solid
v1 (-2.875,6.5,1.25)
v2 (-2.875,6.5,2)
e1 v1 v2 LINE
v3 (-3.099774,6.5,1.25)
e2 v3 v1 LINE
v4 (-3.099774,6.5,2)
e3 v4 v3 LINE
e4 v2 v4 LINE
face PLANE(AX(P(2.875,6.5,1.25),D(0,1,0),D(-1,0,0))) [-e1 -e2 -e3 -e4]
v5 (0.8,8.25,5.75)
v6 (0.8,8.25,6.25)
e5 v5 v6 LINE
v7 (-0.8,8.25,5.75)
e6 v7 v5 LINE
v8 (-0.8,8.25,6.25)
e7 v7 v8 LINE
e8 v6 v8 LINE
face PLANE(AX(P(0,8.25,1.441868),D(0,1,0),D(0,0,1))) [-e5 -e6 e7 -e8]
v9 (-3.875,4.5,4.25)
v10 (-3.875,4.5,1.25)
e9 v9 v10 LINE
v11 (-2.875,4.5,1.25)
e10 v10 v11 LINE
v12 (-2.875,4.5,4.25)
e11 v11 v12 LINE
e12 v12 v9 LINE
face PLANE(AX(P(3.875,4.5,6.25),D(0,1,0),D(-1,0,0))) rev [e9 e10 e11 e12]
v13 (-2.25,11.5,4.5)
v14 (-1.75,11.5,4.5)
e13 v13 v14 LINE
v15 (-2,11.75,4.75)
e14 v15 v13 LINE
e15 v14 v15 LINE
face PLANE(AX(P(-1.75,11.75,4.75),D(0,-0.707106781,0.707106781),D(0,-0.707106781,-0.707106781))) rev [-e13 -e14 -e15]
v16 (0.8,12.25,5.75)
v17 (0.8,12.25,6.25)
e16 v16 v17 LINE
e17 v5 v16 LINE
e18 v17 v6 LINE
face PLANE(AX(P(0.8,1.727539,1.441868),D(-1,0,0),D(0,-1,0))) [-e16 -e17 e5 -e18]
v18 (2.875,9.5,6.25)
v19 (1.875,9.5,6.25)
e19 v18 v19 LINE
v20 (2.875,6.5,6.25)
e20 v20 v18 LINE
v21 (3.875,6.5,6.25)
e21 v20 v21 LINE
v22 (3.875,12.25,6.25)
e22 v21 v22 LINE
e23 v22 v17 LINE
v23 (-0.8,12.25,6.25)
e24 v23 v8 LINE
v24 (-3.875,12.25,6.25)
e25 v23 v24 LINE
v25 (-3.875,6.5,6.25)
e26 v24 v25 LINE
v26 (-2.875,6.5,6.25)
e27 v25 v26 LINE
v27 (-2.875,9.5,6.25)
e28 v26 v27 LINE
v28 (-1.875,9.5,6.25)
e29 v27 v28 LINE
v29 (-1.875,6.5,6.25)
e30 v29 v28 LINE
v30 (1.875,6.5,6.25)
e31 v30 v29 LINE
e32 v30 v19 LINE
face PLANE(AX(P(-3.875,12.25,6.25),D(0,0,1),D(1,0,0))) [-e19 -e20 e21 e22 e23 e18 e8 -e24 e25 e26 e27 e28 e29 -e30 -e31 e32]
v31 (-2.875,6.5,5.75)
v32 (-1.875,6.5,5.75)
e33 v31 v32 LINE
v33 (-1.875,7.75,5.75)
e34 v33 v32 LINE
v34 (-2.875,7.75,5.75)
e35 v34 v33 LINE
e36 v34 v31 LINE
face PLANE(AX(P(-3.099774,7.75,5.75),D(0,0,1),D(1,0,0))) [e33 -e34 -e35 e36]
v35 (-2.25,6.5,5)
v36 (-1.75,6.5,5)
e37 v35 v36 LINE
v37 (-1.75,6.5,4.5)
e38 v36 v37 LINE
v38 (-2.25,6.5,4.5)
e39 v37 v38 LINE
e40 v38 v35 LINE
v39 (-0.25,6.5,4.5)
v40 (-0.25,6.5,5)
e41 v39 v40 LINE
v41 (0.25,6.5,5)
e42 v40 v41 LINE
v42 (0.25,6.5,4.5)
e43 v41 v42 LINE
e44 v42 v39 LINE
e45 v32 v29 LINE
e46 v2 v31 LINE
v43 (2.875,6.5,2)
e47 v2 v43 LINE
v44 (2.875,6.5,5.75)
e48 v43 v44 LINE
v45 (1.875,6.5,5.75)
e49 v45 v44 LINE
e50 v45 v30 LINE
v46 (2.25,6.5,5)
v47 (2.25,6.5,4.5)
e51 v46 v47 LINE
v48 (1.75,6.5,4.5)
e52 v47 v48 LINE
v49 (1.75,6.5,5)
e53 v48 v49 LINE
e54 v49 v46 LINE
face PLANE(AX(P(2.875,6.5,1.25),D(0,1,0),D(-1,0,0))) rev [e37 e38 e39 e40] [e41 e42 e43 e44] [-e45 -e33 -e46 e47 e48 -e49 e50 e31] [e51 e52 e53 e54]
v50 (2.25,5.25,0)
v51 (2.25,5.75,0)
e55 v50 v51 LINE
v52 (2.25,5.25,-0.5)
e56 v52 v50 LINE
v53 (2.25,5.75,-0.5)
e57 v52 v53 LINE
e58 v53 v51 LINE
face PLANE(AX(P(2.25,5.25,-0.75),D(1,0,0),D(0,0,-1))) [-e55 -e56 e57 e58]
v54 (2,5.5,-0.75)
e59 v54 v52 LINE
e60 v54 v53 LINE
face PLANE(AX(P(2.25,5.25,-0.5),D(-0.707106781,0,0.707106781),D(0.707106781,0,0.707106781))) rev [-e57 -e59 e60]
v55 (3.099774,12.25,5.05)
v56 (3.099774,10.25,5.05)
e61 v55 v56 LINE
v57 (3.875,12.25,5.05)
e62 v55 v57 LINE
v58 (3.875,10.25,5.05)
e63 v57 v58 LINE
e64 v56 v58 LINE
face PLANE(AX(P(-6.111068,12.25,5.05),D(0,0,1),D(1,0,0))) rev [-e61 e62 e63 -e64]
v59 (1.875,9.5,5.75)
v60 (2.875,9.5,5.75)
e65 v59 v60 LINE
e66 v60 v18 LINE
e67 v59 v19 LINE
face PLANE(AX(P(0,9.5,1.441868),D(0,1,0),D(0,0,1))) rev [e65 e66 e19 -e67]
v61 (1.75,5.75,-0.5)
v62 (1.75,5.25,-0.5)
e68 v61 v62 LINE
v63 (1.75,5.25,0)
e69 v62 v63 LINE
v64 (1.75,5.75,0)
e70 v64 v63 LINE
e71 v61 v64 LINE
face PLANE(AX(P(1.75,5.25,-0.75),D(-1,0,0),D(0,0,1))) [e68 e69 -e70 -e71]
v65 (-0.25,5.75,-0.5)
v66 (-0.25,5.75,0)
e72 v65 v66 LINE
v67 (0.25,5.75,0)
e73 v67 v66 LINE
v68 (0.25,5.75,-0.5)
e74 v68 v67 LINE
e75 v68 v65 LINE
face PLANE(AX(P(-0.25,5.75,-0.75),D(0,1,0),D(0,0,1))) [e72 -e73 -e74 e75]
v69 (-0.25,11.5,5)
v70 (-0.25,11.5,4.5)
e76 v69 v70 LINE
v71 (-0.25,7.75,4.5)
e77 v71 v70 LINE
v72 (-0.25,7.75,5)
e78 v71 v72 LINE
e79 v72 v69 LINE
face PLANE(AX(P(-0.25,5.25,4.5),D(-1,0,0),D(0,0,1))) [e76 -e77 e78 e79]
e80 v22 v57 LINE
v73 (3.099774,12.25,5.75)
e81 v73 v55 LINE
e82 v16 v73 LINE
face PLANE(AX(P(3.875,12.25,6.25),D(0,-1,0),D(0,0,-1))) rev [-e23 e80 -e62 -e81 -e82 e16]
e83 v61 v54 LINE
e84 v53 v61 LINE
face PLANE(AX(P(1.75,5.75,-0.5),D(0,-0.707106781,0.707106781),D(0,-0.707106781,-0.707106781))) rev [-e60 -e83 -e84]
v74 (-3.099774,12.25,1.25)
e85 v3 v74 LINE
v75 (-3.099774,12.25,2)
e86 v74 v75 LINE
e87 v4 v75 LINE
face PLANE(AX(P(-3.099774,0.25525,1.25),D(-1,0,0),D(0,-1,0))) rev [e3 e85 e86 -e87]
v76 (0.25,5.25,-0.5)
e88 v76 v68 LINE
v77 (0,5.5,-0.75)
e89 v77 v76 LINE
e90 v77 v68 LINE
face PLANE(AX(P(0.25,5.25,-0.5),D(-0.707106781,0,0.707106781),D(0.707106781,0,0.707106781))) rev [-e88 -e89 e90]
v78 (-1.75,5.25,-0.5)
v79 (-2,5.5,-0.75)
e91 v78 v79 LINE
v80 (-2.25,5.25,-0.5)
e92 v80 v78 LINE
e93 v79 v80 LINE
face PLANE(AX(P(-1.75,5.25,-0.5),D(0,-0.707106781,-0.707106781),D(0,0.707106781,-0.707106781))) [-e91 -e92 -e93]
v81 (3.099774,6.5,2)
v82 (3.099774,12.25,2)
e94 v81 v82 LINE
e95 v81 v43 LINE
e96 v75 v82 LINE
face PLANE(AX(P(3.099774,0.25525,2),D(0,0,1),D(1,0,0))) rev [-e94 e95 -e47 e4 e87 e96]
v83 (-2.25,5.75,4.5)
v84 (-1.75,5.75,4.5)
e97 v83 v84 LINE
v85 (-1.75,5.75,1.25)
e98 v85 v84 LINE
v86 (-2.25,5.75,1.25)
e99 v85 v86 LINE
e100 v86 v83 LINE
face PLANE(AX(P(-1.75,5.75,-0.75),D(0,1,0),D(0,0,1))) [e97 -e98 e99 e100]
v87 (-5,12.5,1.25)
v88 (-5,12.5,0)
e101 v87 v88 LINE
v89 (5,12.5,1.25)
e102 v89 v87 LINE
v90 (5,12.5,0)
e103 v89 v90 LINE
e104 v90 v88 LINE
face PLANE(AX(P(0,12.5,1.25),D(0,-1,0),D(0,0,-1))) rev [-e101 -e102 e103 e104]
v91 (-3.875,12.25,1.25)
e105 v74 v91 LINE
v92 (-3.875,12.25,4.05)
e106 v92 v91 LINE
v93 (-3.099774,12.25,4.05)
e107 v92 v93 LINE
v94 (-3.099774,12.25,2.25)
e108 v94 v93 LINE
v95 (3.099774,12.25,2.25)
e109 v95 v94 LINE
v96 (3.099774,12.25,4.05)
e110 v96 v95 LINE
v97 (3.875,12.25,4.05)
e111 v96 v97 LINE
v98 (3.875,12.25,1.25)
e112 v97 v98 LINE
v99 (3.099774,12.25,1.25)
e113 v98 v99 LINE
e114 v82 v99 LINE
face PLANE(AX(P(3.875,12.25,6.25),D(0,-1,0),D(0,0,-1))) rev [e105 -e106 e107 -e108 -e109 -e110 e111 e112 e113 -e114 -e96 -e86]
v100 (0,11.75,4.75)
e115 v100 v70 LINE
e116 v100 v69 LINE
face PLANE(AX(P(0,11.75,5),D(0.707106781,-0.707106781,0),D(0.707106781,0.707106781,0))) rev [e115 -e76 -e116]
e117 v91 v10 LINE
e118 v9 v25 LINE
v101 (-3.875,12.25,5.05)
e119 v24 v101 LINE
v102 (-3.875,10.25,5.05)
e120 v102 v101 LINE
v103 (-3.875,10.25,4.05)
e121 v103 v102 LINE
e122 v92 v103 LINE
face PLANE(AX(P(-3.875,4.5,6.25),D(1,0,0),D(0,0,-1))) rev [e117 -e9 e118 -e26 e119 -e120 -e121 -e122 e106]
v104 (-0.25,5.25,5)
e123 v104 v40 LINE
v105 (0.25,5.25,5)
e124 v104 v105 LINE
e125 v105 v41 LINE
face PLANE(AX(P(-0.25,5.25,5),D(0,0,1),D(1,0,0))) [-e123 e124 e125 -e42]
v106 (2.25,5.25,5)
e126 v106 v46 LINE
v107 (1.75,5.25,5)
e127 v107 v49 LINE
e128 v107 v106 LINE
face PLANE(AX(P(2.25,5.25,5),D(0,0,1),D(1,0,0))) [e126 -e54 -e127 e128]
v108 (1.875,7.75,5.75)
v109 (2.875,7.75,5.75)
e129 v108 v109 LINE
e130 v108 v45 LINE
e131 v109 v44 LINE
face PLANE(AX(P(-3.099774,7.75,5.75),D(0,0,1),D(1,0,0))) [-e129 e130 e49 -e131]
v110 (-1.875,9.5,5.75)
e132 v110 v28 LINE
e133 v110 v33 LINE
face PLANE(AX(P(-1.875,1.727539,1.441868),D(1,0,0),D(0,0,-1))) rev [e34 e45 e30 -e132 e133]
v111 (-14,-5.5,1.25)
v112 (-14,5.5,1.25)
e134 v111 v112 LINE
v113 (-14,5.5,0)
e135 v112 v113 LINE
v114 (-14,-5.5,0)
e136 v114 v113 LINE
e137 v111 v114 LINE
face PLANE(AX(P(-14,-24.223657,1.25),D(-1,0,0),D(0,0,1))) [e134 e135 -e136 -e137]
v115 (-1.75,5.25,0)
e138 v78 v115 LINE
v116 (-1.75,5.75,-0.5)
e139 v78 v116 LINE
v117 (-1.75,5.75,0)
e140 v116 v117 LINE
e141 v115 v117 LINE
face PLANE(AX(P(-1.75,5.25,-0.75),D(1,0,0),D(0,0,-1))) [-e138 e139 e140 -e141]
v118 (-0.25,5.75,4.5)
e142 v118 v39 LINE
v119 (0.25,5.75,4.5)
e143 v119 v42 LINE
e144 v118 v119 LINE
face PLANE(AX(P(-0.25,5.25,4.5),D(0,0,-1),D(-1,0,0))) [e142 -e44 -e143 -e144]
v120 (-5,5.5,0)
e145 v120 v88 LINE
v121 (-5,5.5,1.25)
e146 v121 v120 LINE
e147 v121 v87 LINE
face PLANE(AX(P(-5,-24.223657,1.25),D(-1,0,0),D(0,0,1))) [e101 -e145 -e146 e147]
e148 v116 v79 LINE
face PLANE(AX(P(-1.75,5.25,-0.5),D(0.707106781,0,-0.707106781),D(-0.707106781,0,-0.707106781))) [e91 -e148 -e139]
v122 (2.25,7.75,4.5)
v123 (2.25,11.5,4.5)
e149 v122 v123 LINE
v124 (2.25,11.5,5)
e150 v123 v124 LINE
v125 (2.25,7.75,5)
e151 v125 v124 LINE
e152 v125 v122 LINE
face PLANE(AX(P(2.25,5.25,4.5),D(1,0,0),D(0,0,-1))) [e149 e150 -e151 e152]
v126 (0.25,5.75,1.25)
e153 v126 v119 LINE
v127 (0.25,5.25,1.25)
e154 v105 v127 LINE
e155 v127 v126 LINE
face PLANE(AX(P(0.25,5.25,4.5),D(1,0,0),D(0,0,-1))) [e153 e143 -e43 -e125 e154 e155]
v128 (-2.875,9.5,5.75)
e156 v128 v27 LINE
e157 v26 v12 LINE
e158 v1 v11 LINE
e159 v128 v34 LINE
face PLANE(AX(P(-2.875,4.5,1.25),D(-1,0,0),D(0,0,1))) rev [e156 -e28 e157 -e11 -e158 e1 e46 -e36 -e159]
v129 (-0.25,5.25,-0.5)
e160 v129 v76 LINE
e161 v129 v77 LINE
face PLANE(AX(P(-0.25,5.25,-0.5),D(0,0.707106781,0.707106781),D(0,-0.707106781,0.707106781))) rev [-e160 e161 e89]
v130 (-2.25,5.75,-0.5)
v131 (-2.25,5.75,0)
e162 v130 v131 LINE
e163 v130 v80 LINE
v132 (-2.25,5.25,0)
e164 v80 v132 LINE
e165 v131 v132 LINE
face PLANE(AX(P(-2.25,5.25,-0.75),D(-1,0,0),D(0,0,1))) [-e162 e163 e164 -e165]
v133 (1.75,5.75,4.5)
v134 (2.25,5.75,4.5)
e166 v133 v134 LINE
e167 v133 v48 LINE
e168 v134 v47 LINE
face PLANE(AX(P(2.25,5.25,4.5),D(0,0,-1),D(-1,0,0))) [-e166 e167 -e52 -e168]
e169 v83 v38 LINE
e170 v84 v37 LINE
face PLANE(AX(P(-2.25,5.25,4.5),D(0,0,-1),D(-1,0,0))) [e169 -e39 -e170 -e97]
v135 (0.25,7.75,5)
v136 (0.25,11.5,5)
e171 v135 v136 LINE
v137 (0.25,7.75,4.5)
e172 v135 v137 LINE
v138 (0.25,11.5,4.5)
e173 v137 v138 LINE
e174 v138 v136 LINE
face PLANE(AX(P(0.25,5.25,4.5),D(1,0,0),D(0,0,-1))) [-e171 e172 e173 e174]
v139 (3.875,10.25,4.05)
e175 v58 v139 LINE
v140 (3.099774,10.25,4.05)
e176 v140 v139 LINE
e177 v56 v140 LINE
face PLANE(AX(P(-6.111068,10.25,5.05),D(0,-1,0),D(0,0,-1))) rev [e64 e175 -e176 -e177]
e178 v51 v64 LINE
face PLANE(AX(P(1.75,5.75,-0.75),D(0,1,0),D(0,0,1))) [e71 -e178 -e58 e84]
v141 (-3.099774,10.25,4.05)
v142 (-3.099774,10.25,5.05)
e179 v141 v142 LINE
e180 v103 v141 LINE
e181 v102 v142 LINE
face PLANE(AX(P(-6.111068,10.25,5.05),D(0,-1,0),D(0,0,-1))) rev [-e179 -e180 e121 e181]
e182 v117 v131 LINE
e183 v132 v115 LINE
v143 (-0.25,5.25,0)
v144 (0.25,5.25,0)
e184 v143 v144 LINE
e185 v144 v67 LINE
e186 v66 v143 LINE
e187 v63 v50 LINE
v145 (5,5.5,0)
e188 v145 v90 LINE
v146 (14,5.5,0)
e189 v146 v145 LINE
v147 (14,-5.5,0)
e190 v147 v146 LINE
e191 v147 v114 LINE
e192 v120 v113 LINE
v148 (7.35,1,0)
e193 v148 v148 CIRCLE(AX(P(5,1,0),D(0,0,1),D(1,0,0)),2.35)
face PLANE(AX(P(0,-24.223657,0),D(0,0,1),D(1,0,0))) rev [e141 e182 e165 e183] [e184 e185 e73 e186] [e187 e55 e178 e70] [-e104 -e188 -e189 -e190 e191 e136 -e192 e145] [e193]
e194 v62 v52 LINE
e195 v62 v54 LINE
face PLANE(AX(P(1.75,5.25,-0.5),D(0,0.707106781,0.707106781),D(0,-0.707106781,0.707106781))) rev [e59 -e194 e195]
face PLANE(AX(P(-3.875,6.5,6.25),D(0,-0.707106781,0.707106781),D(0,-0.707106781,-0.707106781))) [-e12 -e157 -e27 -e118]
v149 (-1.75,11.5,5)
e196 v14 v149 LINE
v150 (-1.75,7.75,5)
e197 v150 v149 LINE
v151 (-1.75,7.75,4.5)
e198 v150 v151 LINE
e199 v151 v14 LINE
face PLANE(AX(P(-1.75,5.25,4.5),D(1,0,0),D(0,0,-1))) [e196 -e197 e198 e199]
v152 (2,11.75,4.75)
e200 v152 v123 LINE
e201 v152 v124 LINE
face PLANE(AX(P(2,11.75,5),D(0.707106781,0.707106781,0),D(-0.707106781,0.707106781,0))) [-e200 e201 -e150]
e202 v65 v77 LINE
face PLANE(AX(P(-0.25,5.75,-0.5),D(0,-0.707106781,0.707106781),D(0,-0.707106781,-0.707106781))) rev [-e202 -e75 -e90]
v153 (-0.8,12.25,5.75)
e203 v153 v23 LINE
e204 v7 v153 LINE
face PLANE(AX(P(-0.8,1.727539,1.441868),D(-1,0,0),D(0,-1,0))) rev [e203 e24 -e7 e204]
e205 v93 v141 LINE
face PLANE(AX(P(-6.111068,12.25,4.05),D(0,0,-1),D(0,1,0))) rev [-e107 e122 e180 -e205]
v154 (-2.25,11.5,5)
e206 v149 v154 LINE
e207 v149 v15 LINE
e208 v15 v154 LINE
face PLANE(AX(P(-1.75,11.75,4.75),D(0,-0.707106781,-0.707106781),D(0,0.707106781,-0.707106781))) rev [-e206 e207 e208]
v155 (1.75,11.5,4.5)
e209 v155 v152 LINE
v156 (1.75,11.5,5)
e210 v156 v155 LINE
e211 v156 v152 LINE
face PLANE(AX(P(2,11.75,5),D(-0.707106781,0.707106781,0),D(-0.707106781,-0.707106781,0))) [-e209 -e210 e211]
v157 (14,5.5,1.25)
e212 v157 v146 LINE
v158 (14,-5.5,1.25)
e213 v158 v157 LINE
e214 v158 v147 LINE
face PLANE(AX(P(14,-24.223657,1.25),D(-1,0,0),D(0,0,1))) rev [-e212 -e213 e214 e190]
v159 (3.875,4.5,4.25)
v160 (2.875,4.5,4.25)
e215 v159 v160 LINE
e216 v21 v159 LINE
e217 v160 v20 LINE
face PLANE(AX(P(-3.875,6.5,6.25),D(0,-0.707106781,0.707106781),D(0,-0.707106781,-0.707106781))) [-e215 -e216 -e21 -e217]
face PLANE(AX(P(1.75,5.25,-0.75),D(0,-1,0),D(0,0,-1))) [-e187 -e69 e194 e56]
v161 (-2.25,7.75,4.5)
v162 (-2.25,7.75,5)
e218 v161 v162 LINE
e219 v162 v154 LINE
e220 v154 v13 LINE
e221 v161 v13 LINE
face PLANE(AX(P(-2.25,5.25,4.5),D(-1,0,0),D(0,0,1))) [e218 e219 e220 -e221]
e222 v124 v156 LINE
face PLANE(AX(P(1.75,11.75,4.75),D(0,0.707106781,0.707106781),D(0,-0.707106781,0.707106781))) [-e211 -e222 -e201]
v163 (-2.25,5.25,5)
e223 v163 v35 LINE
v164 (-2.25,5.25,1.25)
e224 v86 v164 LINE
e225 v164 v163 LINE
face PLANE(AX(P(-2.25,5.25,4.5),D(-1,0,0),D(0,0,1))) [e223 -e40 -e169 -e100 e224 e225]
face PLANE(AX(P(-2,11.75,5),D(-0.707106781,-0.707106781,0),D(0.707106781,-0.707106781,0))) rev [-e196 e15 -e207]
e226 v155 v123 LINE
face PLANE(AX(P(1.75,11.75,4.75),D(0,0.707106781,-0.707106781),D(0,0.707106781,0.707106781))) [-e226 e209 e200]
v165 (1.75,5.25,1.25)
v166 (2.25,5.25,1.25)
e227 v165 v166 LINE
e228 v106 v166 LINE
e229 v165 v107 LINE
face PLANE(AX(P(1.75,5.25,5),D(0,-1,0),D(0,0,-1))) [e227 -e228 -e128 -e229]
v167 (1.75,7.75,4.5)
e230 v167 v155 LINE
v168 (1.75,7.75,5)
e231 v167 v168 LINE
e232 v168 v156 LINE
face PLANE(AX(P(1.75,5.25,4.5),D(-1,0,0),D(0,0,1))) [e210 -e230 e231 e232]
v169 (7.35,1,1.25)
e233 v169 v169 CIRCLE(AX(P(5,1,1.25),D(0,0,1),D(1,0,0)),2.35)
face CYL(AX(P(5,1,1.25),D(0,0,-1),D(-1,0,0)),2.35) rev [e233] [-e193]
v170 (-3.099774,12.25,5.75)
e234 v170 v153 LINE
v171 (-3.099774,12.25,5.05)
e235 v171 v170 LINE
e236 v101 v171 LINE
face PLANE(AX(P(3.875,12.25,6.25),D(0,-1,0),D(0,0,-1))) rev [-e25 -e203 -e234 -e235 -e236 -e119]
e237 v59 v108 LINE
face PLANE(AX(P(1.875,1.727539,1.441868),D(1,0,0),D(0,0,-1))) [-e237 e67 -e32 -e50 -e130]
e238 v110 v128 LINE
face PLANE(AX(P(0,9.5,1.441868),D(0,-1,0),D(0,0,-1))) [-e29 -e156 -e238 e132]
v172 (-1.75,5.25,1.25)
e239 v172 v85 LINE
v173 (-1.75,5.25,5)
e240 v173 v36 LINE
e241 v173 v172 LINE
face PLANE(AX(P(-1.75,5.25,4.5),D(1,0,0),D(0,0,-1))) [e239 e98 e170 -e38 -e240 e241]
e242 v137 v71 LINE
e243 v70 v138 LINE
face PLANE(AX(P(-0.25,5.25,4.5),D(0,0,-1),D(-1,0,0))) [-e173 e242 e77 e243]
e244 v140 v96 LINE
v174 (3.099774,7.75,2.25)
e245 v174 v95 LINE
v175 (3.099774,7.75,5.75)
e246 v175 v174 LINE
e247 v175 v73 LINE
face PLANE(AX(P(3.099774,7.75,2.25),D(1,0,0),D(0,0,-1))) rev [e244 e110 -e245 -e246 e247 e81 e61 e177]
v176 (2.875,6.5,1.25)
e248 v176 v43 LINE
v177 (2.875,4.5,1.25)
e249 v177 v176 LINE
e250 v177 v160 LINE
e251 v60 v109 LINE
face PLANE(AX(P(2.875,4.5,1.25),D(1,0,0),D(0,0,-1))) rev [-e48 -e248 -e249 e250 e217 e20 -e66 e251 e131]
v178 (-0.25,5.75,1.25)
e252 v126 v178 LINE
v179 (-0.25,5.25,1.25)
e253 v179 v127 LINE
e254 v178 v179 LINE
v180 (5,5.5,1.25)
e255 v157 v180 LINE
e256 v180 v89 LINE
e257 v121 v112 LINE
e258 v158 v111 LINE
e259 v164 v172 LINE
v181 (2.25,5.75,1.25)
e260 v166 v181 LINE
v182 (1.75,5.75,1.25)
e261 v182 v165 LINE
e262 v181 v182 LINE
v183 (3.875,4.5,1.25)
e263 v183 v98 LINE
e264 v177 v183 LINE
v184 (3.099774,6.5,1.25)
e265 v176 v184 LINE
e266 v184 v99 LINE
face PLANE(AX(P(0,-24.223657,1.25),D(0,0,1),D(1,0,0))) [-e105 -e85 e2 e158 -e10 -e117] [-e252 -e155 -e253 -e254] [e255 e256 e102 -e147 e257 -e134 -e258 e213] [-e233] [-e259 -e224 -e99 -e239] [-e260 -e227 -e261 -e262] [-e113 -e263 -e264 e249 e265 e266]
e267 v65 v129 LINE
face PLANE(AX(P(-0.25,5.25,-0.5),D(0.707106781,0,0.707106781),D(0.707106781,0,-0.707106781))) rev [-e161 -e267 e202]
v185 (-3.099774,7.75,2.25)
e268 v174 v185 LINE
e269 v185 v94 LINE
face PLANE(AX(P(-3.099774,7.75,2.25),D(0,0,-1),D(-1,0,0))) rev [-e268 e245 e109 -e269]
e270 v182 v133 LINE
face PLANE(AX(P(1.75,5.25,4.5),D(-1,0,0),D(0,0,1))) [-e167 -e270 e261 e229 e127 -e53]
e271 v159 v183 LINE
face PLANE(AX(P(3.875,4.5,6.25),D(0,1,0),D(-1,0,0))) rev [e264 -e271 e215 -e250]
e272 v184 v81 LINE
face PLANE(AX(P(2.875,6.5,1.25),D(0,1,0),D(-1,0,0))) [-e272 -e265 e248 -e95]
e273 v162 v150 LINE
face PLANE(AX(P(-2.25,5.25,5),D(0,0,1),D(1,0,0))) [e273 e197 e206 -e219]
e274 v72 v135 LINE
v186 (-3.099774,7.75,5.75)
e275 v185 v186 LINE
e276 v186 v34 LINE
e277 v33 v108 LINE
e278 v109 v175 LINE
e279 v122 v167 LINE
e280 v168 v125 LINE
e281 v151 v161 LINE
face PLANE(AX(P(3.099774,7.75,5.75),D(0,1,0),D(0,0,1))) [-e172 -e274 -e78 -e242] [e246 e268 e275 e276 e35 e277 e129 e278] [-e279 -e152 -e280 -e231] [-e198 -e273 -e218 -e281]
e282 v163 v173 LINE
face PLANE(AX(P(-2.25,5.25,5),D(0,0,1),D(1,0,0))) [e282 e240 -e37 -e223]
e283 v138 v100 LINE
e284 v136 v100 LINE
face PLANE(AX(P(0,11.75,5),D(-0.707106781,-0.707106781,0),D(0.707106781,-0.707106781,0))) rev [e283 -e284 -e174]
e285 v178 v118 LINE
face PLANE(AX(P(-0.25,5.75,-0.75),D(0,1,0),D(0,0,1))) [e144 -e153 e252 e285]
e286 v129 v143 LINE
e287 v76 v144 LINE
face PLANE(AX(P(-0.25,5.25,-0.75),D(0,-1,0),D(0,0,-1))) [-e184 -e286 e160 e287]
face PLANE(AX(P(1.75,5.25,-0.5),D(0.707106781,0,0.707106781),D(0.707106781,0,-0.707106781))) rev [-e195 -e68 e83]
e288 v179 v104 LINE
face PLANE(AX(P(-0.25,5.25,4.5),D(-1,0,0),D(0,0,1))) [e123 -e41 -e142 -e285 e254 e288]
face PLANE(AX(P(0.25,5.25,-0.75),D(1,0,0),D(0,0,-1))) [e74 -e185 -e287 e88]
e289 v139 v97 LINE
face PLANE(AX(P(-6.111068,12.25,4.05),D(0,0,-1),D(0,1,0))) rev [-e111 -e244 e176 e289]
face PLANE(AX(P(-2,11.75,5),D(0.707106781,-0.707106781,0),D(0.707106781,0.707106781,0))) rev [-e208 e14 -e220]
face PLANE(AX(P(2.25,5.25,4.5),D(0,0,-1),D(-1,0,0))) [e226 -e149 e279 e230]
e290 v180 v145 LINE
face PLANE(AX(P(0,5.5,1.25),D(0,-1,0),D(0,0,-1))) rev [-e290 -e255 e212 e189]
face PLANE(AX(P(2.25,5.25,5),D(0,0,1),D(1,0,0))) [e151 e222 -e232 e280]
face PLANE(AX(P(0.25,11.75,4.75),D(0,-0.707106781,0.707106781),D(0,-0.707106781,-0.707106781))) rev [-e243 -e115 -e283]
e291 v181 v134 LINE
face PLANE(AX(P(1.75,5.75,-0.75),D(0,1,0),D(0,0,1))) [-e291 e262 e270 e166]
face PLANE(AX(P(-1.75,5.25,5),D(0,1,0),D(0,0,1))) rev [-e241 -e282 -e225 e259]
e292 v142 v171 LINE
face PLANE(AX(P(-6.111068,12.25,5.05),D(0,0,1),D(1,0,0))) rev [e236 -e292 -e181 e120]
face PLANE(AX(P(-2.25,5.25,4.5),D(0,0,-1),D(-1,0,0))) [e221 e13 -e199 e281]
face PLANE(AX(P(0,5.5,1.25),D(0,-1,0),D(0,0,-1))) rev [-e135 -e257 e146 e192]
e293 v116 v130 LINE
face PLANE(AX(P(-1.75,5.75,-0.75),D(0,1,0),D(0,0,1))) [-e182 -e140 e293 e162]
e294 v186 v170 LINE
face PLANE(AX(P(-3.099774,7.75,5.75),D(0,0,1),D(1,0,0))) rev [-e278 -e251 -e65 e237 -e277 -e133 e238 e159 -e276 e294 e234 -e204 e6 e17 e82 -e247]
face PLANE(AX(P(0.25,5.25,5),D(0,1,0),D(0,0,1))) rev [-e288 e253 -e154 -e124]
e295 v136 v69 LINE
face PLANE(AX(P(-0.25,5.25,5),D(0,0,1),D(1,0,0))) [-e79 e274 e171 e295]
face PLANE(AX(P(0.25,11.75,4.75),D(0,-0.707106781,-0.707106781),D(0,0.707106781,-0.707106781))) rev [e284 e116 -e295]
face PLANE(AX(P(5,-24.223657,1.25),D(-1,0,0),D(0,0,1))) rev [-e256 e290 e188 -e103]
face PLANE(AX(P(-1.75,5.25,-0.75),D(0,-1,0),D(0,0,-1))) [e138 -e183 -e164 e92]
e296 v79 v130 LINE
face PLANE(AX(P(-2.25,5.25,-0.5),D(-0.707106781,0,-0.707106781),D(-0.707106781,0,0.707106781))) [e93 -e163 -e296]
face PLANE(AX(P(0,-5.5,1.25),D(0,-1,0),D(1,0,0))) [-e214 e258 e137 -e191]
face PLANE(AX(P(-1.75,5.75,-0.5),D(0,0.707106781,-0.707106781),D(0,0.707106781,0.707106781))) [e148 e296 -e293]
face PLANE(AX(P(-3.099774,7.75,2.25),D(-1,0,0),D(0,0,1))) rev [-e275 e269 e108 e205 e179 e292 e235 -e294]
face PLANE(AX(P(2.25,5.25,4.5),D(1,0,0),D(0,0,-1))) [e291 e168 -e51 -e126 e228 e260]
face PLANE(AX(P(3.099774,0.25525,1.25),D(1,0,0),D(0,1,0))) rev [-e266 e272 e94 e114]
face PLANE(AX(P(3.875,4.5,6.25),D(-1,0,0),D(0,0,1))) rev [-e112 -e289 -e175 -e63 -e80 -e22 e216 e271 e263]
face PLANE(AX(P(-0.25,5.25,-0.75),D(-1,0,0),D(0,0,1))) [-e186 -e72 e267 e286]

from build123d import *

# Parameters (mm, degrees)
CROQUIS1_W          = 10
CROQUIS1_H          = 7
EXTRUIR1_DEPTH      = 1.25
CROQUIS2_W          = 7.75
CROQUIS2_H          = 7.75
EXTRUIR2_DEPTH      = 5
CROQUIS3_W          = 6.199548142
CROQUIS3_H          = 3.5
EXTRUIR3_DEPTH      = 4.5
CROQUIS4_W          = 5.75
CROQUIS4_H          = 2
EXTRUIR4_DEPTH      = 5
CHAFL_N1_SIZE       = 2
CROQUIS5_W          = 6.199548142
CROQUIS5_H          = 0.75
EXTRUIR5_DEPTH      = 5.75
CROQUIS6_W          = 1
CROQUIS6_H          = 3
CROQUIS6_W_2        = 0.8
CROQUIS6_H_2        = 4
EXTRUIR6_DEPTH      = 0.5
EXTRUIR7_REACH      = 24.69
CROQUIS7_W          = 1
CROQUIS7_H          = 2
EXTRUIR8_DEPTH      = 4
EXTRUIR8_DEPTH_BACK = 2.5
CROQUIS8_W          = 0.5
CROQUIS8_H          = 0.5
CHAFL_N2_SIZE       = 0.25
CROQUIS9_W          = 0.5
CROQUIS9_H          = 0.5
EXTRUIR9_DEPTH      = 5.75
CHAFL_N3_SIZE       = 0.25


with BuildPart() as part:
    # Croquis1 → Extruir1 (new body)
    with BuildSketch(Plane.XY):
        with BuildLine():
            Line((-14, -5.5), (14, -5.5))
            Line((14, -5.5), (14, 5.5))
            Line((14, 5.5), (5, 5.5))
            Line((5, 5.5), (5, 3.35))
            ThreePointArc((5, 3.35), (6.661700936, 2.661700936), (7.35, 1))
            ThreePointArc((7.35, 1), (6.661700936, -0.661700936), (5, -1.35))
            Line((5, -1.35), (5, -1.5))
            Line((5, -1.5), (-5, -1.5))
            Line((-5, -1.5), (-5, 5.5))
            Line((-5, 5.5), (-14, 5.5))
            Line((-14, 5.5), (-14, -5.5))
        make_face()
        with Locations((0, 9)):
            Rectangle(CROQUIS1_W, CROQUIS1_H)
        with BuildLine():
            Line((5, 3.35), (5, 5.5))
            Line((5, 5.5), (-5, 5.5))
            Line((-5, 5.5), (-5, -1.5))
            Line((-5, -1.5), (5, -1.5))
            Line((5, -1.5), (5, -1.35))
            ThreePointArc((5, -1.35), (2.65, 1), (5, 3.35))
        make_face()
    extrude(amount=EXTRUIR1_DEPTH)

    # Croquis2 → Extruir2 (add)
    with BuildSketch(Plane.XY.offset(1.25)):
        with Locations((0, 8.375)):
            Rectangle(CROQUIS2_W, CROQUIS2_H)
    extrude(amount=EXTRUIR2_DEPTH)

    # Croquis3 → Extruir3 (cut)
    with BuildSketch(Plane(origin=(0, 12.25, 0), x_dir=(-1, 0, 0), z_dir=(0, 1, 0))):
        with Locations((0, 4)):
            Rectangle(CROQUIS3_W, CROQUIS3_H)
    extrude(amount=-EXTRUIR3_DEPTH, mode=Mode.SUBTRACT)

    # Croquis4 → Extruir4 (cut)
    with BuildSketch(Plane.XY.offset(6.25)):
        with Locations((0, 5.5)):
            Rectangle(CROQUIS4_W, CROQUIS4_H)
    extrude(amount=-EXTRUIR4_DEPTH, mode=Mode.SUBTRACT)

    # Chaflán1
    chafl_n1_edges = [part.edges().sort_by_distance(p)[0] for p in [
        (3.375, 4.5, 6.25),
        (-3.375, 4.5, 6.25),
    ]]
    chamfer(chafl_n1_edges, length=CHAFL_N1_SIZE)

    # Croquis5 → Extruir5 (cut)
    with BuildSketch(Plane(origin=(0, 12.25, 0), x_dir=(-1, 0, 0), z_dir=(0, 1, 0))):
        with Locations((0, 1.625)):
            Rectangle(CROQUIS5_W, CROQUIS5_H)
    extrude(amount=-EXTRUIR5_DEPTH, mode=Mode.SUBTRACT)

    # Croquis6 → Extruir6 (cut)
    with BuildSketch(Plane.XY.offset(6.25)):
        with Locations((-2.375, 8)):
            Rectangle(CROQUIS6_W, CROQUIS6_H)
        with Locations((0.4, 10.25)):
            Rectangle(CROQUIS6_W_2, CROQUIS6_H_2)
        with Locations((-0.4, 10.25)):
            Rectangle(CROQUIS6_W_2, CROQUIS6_H_2)
        with Locations((2.375, 8)):
            Rectangle(CROQUIS6_W, CROQUIS6_H)
    extrude(amount=-EXTRUIR6_DEPTH, mode=Mode.SUBTRACT)

    # Extruir7: up to this face of the body (flat: up to its plane)
    extruir7_end = Plane(part.part.faces().sort_by_distance((-3.875, 8.549603175, 3.650226757))[0])
    # Croquis7 → Extruir7 (cut, up to the picked face)
    with BuildSketch(Plane(origin=(3.875, 0, 0), x_dir=(0, 0, -1), z_dir=(1, 0, 0)), mode=Mode.PRIVATE) as extruir7_sk1:
        with Locations((-4.55, 11.25)):
            Rectangle(CROQUIS7_W, CROQUIS7_H)
    extruir7_tool1 = split(extrude(extruir7_sk1.sketch, amount=-EXTRUIR7_REACH, mode=Mode.PRIVATE), bisect_by=extruir7_end, keep=Keep.BOTH, mode=Mode.PRIVATE)
    add(extruir7_tool1.solids().sort_by(Axis((3.875, 11.25, 4.55), (-1, 0, 0)))[0], mode=Mode.SUBTRACT)

    # Croquis8 → Extruir8 (add, two sides: drawn at the far end of the back side and taken through both)
    with BuildSketch(Plane(origin=(0, 7.75, 0), x_dir=(-1, 0, 0), z_dir=(0, 1, 0)).offset(-EXTRUIR8_DEPTH_BACK)):
        with Locations((0, 4.75)):
            Rectangle(CROQUIS8_W, CROQUIS8_H)
        with Locations((2, 4.75)):
            Rectangle(CROQUIS8_W, CROQUIS8_H)
        with Locations((-2, 4.75)):
            Rectangle(CROQUIS8_W, CROQUIS8_H)
    extrude(amount=EXTRUIR8_DEPTH + EXTRUIR8_DEPTH_BACK)

    # Chaflán2
    chafl_n2_edges = [part.edges().sort_by_distance(p)[0] for p in [
        (0.25, 11.75, 4.75),
        (0, 11.75, 4.5),
        (-0.25, 11.75, 4.75),
        (0, 11.75, 5),
        (-1.75, 11.75, 4.75),
        (-2, 11.75, 4.5),
        (-2.25, 11.75, 4.75),
        (-2, 11.75, 5),
        (1.75, 11.75, 4.75),
        (2, 11.75, 5),
        (2.25, 11.75, 4.75),
        (2, 11.75, 4.5),
    ]]
    chamfer(chafl_n2_edges, length=CHAFL_N2_SIZE - 0.0001)  # a hair under: the kernel refuses the full size

    # Croquis9 → Extruir9 (add)
    with BuildSketch(Plane.XY.offset(5)):
        with Locations((-2, 5.5)):
            Rectangle(CROQUIS9_W, CROQUIS9_H)
        with Locations((0, 5.5)):
            Rectangle(CROQUIS9_W, CROQUIS9_H)
        with Locations((2, 5.5)):
            Rectangle(CROQUIS9_W, CROQUIS9_H)
    extrude(amount=-EXTRUIR9_DEPTH)

    # Chaflán3
    chafl_n3_edges = [part.edges().sort_by_distance(p)[0] for p in [
        (-2, 5.25, -0.75),
        (-2, 5.75, -0.75),
        (-1.75, 5.5, -0.75),
        (-2.25, 5.5, -0.75),
        (0, 5.75, -0.75),
        (0, 5.25, -0.75),
        (-0.25, 5.5, -0.75),
        (0.25, 5.5, -0.75),
        (2, 5.75, -0.75),
        (2, 5.25, -0.75),
        (1.75, 5.5, -0.75),
        (2.25, 5.5, -0.75),
    ]]
    chamfer(chafl_n3_edges, length=CHAFL_N3_SIZE - 0.0001)  # a hair under: the kernel refuses the full size


solid = part.part
